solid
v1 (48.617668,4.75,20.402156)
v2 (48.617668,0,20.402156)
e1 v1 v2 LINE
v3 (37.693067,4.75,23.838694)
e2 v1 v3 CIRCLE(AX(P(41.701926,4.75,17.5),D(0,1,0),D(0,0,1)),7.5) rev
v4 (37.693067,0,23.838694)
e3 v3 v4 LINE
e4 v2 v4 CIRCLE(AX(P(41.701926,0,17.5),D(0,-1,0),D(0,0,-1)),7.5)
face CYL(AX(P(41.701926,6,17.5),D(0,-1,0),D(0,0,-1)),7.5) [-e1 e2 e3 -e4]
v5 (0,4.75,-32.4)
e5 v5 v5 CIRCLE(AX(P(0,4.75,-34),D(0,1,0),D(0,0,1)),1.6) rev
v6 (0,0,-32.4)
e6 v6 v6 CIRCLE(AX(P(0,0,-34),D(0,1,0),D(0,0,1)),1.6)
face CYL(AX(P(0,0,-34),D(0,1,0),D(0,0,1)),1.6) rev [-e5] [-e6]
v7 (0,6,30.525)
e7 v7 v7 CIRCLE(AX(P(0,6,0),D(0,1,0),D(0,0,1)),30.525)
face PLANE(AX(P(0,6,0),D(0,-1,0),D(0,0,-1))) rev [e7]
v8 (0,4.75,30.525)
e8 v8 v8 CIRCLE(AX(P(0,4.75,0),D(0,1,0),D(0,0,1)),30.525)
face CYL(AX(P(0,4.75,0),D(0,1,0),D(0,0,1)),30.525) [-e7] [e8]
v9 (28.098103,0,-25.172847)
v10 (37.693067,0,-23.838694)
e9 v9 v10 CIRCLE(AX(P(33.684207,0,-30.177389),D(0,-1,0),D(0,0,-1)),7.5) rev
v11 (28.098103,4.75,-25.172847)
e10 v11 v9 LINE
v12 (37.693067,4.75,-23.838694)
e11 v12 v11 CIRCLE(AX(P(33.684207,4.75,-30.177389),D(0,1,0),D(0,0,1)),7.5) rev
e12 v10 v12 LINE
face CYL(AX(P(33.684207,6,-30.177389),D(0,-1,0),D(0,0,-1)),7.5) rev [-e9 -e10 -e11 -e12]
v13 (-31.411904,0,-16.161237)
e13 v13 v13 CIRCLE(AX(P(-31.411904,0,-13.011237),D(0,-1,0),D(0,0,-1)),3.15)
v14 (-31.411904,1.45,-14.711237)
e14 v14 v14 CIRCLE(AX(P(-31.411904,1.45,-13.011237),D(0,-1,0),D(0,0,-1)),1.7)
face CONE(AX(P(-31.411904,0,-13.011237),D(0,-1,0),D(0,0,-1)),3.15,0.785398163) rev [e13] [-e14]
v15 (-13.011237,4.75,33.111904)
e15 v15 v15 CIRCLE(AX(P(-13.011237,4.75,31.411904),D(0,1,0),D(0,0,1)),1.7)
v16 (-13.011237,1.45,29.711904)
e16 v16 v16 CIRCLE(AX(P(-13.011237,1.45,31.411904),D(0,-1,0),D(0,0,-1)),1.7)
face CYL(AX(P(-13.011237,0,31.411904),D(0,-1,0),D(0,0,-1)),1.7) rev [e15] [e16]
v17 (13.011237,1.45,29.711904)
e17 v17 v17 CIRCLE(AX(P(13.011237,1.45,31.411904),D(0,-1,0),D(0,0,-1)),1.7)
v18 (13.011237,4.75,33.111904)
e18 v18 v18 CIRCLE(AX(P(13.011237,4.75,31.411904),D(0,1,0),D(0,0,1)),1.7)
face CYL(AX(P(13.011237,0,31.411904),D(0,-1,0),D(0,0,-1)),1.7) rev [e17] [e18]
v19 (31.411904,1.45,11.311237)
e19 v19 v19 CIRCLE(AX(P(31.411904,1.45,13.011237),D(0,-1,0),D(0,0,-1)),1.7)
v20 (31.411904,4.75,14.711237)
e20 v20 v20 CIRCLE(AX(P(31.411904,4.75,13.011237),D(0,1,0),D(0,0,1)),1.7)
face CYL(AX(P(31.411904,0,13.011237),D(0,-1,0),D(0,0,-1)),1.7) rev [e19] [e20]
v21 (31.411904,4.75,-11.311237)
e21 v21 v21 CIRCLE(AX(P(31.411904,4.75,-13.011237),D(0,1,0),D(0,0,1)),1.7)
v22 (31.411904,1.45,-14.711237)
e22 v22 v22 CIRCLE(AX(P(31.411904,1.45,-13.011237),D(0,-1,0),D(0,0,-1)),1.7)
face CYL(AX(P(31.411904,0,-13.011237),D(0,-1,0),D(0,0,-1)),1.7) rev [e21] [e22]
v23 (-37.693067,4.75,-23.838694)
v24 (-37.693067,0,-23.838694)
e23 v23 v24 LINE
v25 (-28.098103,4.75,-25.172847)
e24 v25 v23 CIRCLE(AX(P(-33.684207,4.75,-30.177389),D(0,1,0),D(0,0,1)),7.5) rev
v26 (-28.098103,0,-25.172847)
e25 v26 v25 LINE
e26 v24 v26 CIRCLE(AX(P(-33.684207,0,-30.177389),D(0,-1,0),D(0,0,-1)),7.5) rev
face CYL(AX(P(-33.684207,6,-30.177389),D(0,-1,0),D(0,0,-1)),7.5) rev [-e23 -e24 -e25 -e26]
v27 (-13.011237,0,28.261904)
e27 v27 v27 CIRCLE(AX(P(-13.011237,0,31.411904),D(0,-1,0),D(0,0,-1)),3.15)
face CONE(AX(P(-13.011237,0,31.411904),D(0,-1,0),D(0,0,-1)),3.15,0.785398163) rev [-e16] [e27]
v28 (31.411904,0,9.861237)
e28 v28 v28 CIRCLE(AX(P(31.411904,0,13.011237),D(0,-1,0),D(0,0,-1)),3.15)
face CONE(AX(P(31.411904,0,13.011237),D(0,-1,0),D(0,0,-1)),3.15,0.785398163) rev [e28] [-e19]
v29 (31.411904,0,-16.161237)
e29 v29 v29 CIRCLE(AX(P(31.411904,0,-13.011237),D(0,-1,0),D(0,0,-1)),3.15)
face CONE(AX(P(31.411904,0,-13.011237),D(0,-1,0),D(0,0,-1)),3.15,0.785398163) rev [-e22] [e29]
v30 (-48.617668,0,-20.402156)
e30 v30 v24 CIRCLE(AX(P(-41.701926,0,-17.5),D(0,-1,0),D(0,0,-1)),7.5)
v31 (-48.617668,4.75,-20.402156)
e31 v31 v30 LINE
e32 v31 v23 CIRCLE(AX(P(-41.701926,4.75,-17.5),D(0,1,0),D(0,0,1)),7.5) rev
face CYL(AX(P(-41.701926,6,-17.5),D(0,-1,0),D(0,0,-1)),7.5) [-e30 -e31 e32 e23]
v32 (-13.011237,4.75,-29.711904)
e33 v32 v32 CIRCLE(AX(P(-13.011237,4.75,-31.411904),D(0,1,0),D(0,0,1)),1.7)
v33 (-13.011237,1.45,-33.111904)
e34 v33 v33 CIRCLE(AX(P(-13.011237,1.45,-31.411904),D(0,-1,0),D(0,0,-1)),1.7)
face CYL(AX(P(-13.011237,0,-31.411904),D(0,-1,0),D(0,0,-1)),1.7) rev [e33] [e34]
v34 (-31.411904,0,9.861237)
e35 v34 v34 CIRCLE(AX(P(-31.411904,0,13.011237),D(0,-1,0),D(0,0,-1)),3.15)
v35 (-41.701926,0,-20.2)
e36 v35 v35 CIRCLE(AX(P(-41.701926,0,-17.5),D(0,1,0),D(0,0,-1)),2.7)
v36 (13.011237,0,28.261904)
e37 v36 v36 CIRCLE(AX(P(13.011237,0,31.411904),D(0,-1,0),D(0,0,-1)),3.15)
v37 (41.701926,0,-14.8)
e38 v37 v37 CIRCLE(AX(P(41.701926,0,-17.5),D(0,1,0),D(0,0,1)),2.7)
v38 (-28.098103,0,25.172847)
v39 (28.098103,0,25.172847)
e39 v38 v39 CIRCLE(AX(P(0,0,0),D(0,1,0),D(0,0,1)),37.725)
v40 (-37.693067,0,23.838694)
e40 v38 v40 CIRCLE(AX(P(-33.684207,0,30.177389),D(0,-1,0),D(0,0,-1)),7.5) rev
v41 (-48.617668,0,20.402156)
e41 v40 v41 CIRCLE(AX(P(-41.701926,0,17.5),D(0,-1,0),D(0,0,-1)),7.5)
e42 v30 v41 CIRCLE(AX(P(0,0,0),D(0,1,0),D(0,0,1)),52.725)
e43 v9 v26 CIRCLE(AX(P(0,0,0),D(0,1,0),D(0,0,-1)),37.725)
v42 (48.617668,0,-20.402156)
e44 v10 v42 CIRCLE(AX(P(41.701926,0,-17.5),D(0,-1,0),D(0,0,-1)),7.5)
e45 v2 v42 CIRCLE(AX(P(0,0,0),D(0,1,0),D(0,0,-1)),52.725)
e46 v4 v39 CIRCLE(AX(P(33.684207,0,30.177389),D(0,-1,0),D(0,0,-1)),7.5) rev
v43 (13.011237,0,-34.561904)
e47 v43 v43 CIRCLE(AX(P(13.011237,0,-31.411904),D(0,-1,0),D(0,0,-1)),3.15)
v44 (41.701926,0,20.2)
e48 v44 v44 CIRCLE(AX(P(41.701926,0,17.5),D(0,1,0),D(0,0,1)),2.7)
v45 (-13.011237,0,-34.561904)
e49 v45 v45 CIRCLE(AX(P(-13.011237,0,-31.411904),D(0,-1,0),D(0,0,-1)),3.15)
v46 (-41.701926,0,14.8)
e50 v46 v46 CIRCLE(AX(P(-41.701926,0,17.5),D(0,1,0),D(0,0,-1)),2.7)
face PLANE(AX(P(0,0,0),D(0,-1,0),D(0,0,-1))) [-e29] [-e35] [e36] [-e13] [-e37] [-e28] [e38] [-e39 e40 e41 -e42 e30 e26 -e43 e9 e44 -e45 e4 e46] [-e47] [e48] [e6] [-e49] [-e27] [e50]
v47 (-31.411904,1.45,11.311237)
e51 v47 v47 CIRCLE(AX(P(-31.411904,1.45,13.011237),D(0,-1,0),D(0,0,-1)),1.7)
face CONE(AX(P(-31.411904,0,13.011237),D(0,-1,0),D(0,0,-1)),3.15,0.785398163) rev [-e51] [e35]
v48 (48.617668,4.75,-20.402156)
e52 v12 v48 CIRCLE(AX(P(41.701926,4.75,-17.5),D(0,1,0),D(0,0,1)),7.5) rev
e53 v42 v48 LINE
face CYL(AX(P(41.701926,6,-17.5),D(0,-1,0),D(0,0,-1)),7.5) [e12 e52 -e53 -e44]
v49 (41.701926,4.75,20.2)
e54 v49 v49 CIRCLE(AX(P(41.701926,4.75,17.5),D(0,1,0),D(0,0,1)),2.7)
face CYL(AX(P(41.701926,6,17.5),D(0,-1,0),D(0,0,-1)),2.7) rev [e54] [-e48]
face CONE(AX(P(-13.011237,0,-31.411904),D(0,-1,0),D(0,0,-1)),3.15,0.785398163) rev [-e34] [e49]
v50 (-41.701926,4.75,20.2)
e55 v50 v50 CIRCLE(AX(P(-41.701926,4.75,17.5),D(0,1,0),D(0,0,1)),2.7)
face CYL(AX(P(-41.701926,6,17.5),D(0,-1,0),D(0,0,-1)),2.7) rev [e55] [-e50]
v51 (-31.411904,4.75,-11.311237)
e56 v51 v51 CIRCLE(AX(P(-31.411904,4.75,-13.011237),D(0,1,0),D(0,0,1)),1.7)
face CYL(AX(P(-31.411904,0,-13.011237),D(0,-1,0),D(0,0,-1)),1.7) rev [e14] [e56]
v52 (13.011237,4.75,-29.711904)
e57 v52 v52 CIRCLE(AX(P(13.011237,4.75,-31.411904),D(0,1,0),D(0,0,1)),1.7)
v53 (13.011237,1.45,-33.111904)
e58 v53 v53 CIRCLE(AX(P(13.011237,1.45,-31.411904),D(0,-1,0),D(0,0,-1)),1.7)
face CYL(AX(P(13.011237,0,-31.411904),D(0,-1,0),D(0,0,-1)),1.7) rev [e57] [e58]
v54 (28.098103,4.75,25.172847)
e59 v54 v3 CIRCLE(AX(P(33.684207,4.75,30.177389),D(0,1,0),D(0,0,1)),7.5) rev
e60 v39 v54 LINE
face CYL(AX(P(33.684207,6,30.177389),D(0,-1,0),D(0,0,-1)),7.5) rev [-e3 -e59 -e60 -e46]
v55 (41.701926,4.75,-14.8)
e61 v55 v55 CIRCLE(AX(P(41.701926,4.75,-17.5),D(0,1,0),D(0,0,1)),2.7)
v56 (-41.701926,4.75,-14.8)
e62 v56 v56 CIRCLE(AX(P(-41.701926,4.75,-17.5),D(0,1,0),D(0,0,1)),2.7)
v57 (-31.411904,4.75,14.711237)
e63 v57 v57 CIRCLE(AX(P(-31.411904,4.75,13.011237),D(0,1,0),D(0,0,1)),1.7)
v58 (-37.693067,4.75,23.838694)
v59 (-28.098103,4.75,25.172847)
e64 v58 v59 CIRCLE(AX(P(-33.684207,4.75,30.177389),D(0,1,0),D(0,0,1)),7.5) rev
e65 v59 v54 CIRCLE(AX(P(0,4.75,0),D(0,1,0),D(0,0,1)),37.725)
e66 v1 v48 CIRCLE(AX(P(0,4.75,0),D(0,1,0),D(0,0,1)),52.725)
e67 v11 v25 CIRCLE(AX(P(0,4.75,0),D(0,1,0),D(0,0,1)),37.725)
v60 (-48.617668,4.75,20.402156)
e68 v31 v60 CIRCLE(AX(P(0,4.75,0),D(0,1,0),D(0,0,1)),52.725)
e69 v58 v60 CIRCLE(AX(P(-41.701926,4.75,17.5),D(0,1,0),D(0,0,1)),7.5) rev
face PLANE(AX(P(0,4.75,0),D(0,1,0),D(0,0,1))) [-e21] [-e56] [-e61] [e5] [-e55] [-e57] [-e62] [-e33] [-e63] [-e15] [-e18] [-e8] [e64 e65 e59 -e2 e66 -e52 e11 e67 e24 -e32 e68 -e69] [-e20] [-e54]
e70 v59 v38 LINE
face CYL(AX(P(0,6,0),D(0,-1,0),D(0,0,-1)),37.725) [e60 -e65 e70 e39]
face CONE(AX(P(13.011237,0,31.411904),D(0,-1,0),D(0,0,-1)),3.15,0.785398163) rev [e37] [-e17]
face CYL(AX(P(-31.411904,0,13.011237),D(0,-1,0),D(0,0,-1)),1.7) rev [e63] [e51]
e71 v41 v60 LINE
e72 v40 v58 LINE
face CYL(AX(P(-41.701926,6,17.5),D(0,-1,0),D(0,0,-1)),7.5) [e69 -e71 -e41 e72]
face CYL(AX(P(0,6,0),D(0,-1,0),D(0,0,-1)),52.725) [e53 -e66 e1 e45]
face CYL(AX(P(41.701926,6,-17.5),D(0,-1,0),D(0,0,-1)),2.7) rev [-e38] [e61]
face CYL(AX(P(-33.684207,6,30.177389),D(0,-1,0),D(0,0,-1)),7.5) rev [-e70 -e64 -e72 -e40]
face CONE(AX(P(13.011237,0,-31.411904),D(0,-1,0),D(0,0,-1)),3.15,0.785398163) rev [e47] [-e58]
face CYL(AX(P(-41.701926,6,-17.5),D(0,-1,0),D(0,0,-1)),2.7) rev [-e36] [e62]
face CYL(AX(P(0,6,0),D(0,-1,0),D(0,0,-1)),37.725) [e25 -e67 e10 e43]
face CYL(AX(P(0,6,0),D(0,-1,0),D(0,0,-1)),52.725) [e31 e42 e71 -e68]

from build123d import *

# Parameters (mm, degrees)
SKETCH1_R                                       = 1
SKETCH1_R_2                                     = 2.7
BOSS_EXTRUDE1_DEPTH                             = 6
FILLET1_R                                       = 7.5
SKETCH2_R                                       = 1.6
CUT_EXTRUDE1_DEPTH                              = 66.108380797
SKETCH3_OUTSIDE_W                               = 133.41
SKETCH3_OUTSIDE_H                               = 103.41
SKETCH3_OUTSIDE_R                               = 30.525
CUT_EXTRUDE3_DEPTH                              = 1.25
CSK_FOR_M3_FLAT_HEAD_MACHINE_SCREW1_D           = 3.4
CSK_FOR_M3_FLAT_HEAD_MACHINE_SCREW1_CSINK_D     = 6.3
CSK_FOR_M3_FLAT_HEAD_MACHINE_SCREW1_CSINK_ANGLE = 90


with BuildPart() as part:
    # Sketch1 → Boss-Extrude1 (new body)
    with BuildSketch(Plane(origin=(0, 0, 0), x_dir=(1, 0, 0), z_dir=(0, 1, 0))):
        with BuildLine():
            Line((31.883633055, 20.164562188), (44.561021943, 28.182280752))
            ThreePointArc((44.561021943, 28.182280752), (52.725, 0), (44.561021943, -28.182280752))
            Line((44.561021943, -28.182280752), (31.883633055, -20.164562188))
            ThreePointArc((31.883633055, -20.164562188), (0, -37.725), (-31.883633055, -20.164562188))
            Line((-31.883633055, -20.164562188), (-44.561021943, -28.182280752))
            ThreePointArc((-44.561021943, -28.182280752), (-52.725, 0), (-44.561021943, 28.182280752))
            Line((-44.561021943, 28.182280752), (-31.883633055, 20.164562188))
            ThreePointArc((-31.883633055, 20.164562188), (0, 37.725), (31.883633055, 20.164562188))
        make_face()
        with Locations(Location((-13.0112367, 31.411904105, 0), (0, 0, 270))):
            Circle(SKETCH1_R, mode=Mode.SUBTRACT)
        with Locations(Location((13.0112367, 31.411904105, 0), (0, 0, 270))):
            Circle(SKETCH1_R, mode=Mode.SUBTRACT)
        with Locations(Location((31.411904105, 13.0112367, 0), (0, 0, 270))):
            Circle(SKETCH1_R, mode=Mode.SUBTRACT)
        with Locations(Location((31.411904105, -13.0112367, 0), (0, 0, 270))):
            Circle(SKETCH1_R, mode=Mode.SUBTRACT)
        with Locations(Location((13.0112367, -31.411904105, 0), (0, 0, 270))):
            Circle(SKETCH1_R, mode=Mode.SUBTRACT)
        with Locations(Location((-13.0112367, -31.411904105, 0), (0, 0, 270))):
            Circle(SKETCH1_R, mode=Mode.SUBTRACT)
        with Locations(Location((-31.411904105, -13.0112367, 0), (0, 0, 270))):
            Circle(SKETCH1_R, mode=Mode.SUBTRACT)
        with Locations(Location((-31.411904105, 13.0112367, 0), (0, 0, 270))):
            Circle(SKETCH1_R, mode=Mode.SUBTRACT)
        with Locations(Location((41.701925915, 17.5, 0), (0, 0, 270))):
            Circle(SKETCH1_R_2, mode=Mode.SUBTRACT)
        with Locations(Location((41.701925915, -17.5, 0), (0, 0, 270))):
            Circle(SKETCH1_R_2, mode=Mode.SUBTRACT)
        with Locations(Location((-41.701925915, 17.5, 0), (0, 0, 90))):
            Circle(SKETCH1_R_2, mode=Mode.SUBTRACT)
        with Locations(Location((-41.701925915, -17.5, 0), (0, 0, 90))):
            Circle(SKETCH1_R_2, mode=Mode.SUBTRACT)
    extrude(amount=BOSS_EXTRUDE1_DEPTH)

    # Fillet1
    fillet1_edges = [part.edges().sort_by_distance(p)[0] for p in [
        (44.561021943, 3, 28.182280752),
        (31.883633055, 3, 20.164562188),
        (-44.561021943, 3, 28.182280752),
        (-31.883633055, 3, 20.164562188),
        (44.561021943, 3, -28.182280752),
        (31.883633055, 3, -20.164562188),
        (-44.561021943, 3, -28.182280752),
        (-31.883633055, 3, -20.164562188),
    ]]
    fillet(fillet1_edges, radius=FILLET1_R - 0.0001)  # a hair under: the kernel refuses the full size

    # Sketch2 → Cut-Extrude1 (cut, through all)
    with BuildSketch(Plane(origin=(0, 6, 0), x_dir=(1, 0, 0), z_dir=(0, 1, 0))):
        with Locations(Location((0, 34, 0), (0, 0, 270))):
            Circle(SKETCH2_R)
    extrude(amount=-CUT_EXTRUDE1_DEPTH, mode=Mode.SUBTRACT)

    # Sketch3 outside → Cut-Extrude3 (cut)
    with BuildSketch(Plane(origin=(0, 6, 0), x_dir=(1, 0, 0), z_dir=(0, 1, 0))):
        Rectangle(SKETCH3_OUTSIDE_W, SKETCH3_OUTSIDE_H)
        with Locations(Location((0, 0, 0), (0, 0, 270))):
            Circle(SKETCH3_OUTSIDE_R, mode=Mode.SUBTRACT)
    extrude(amount=-CUT_EXTRUDE3_DEPTH, mode=Mode.SUBTRACT)

    # CSK for M3 Flat Head Machine Screw1 (through all)
    with Locations(Plane(origin=(0, 0, 0), x_dir=(-1, 0, 0), z_dir=(0, -1, 0))):
        with Locations((13.0112367, -31.411904105), (-13.0112367, -31.411904105), (-31.411904105, -13.0112367), (-31.411904105, 13.0112367), (-13.0112367, 31.411904105), (13.0112367, 31.411904105), (31.411904105, 13.0112367), (31.411904105, -13.0112367)):
            CounterSinkHole(CSK_FOR_M3_FLAT_HEAD_MACHINE_SCREW1_D / 2, CSK_FOR_M3_FLAT_HEAD_MACHINE_SCREW1_CSINK_D / 2, counter_sink_angle=CSK_FOR_M3_FLAT_HEAD_MACHINE_SCREW1_CSINK_ANGLE)


solid = part.part
